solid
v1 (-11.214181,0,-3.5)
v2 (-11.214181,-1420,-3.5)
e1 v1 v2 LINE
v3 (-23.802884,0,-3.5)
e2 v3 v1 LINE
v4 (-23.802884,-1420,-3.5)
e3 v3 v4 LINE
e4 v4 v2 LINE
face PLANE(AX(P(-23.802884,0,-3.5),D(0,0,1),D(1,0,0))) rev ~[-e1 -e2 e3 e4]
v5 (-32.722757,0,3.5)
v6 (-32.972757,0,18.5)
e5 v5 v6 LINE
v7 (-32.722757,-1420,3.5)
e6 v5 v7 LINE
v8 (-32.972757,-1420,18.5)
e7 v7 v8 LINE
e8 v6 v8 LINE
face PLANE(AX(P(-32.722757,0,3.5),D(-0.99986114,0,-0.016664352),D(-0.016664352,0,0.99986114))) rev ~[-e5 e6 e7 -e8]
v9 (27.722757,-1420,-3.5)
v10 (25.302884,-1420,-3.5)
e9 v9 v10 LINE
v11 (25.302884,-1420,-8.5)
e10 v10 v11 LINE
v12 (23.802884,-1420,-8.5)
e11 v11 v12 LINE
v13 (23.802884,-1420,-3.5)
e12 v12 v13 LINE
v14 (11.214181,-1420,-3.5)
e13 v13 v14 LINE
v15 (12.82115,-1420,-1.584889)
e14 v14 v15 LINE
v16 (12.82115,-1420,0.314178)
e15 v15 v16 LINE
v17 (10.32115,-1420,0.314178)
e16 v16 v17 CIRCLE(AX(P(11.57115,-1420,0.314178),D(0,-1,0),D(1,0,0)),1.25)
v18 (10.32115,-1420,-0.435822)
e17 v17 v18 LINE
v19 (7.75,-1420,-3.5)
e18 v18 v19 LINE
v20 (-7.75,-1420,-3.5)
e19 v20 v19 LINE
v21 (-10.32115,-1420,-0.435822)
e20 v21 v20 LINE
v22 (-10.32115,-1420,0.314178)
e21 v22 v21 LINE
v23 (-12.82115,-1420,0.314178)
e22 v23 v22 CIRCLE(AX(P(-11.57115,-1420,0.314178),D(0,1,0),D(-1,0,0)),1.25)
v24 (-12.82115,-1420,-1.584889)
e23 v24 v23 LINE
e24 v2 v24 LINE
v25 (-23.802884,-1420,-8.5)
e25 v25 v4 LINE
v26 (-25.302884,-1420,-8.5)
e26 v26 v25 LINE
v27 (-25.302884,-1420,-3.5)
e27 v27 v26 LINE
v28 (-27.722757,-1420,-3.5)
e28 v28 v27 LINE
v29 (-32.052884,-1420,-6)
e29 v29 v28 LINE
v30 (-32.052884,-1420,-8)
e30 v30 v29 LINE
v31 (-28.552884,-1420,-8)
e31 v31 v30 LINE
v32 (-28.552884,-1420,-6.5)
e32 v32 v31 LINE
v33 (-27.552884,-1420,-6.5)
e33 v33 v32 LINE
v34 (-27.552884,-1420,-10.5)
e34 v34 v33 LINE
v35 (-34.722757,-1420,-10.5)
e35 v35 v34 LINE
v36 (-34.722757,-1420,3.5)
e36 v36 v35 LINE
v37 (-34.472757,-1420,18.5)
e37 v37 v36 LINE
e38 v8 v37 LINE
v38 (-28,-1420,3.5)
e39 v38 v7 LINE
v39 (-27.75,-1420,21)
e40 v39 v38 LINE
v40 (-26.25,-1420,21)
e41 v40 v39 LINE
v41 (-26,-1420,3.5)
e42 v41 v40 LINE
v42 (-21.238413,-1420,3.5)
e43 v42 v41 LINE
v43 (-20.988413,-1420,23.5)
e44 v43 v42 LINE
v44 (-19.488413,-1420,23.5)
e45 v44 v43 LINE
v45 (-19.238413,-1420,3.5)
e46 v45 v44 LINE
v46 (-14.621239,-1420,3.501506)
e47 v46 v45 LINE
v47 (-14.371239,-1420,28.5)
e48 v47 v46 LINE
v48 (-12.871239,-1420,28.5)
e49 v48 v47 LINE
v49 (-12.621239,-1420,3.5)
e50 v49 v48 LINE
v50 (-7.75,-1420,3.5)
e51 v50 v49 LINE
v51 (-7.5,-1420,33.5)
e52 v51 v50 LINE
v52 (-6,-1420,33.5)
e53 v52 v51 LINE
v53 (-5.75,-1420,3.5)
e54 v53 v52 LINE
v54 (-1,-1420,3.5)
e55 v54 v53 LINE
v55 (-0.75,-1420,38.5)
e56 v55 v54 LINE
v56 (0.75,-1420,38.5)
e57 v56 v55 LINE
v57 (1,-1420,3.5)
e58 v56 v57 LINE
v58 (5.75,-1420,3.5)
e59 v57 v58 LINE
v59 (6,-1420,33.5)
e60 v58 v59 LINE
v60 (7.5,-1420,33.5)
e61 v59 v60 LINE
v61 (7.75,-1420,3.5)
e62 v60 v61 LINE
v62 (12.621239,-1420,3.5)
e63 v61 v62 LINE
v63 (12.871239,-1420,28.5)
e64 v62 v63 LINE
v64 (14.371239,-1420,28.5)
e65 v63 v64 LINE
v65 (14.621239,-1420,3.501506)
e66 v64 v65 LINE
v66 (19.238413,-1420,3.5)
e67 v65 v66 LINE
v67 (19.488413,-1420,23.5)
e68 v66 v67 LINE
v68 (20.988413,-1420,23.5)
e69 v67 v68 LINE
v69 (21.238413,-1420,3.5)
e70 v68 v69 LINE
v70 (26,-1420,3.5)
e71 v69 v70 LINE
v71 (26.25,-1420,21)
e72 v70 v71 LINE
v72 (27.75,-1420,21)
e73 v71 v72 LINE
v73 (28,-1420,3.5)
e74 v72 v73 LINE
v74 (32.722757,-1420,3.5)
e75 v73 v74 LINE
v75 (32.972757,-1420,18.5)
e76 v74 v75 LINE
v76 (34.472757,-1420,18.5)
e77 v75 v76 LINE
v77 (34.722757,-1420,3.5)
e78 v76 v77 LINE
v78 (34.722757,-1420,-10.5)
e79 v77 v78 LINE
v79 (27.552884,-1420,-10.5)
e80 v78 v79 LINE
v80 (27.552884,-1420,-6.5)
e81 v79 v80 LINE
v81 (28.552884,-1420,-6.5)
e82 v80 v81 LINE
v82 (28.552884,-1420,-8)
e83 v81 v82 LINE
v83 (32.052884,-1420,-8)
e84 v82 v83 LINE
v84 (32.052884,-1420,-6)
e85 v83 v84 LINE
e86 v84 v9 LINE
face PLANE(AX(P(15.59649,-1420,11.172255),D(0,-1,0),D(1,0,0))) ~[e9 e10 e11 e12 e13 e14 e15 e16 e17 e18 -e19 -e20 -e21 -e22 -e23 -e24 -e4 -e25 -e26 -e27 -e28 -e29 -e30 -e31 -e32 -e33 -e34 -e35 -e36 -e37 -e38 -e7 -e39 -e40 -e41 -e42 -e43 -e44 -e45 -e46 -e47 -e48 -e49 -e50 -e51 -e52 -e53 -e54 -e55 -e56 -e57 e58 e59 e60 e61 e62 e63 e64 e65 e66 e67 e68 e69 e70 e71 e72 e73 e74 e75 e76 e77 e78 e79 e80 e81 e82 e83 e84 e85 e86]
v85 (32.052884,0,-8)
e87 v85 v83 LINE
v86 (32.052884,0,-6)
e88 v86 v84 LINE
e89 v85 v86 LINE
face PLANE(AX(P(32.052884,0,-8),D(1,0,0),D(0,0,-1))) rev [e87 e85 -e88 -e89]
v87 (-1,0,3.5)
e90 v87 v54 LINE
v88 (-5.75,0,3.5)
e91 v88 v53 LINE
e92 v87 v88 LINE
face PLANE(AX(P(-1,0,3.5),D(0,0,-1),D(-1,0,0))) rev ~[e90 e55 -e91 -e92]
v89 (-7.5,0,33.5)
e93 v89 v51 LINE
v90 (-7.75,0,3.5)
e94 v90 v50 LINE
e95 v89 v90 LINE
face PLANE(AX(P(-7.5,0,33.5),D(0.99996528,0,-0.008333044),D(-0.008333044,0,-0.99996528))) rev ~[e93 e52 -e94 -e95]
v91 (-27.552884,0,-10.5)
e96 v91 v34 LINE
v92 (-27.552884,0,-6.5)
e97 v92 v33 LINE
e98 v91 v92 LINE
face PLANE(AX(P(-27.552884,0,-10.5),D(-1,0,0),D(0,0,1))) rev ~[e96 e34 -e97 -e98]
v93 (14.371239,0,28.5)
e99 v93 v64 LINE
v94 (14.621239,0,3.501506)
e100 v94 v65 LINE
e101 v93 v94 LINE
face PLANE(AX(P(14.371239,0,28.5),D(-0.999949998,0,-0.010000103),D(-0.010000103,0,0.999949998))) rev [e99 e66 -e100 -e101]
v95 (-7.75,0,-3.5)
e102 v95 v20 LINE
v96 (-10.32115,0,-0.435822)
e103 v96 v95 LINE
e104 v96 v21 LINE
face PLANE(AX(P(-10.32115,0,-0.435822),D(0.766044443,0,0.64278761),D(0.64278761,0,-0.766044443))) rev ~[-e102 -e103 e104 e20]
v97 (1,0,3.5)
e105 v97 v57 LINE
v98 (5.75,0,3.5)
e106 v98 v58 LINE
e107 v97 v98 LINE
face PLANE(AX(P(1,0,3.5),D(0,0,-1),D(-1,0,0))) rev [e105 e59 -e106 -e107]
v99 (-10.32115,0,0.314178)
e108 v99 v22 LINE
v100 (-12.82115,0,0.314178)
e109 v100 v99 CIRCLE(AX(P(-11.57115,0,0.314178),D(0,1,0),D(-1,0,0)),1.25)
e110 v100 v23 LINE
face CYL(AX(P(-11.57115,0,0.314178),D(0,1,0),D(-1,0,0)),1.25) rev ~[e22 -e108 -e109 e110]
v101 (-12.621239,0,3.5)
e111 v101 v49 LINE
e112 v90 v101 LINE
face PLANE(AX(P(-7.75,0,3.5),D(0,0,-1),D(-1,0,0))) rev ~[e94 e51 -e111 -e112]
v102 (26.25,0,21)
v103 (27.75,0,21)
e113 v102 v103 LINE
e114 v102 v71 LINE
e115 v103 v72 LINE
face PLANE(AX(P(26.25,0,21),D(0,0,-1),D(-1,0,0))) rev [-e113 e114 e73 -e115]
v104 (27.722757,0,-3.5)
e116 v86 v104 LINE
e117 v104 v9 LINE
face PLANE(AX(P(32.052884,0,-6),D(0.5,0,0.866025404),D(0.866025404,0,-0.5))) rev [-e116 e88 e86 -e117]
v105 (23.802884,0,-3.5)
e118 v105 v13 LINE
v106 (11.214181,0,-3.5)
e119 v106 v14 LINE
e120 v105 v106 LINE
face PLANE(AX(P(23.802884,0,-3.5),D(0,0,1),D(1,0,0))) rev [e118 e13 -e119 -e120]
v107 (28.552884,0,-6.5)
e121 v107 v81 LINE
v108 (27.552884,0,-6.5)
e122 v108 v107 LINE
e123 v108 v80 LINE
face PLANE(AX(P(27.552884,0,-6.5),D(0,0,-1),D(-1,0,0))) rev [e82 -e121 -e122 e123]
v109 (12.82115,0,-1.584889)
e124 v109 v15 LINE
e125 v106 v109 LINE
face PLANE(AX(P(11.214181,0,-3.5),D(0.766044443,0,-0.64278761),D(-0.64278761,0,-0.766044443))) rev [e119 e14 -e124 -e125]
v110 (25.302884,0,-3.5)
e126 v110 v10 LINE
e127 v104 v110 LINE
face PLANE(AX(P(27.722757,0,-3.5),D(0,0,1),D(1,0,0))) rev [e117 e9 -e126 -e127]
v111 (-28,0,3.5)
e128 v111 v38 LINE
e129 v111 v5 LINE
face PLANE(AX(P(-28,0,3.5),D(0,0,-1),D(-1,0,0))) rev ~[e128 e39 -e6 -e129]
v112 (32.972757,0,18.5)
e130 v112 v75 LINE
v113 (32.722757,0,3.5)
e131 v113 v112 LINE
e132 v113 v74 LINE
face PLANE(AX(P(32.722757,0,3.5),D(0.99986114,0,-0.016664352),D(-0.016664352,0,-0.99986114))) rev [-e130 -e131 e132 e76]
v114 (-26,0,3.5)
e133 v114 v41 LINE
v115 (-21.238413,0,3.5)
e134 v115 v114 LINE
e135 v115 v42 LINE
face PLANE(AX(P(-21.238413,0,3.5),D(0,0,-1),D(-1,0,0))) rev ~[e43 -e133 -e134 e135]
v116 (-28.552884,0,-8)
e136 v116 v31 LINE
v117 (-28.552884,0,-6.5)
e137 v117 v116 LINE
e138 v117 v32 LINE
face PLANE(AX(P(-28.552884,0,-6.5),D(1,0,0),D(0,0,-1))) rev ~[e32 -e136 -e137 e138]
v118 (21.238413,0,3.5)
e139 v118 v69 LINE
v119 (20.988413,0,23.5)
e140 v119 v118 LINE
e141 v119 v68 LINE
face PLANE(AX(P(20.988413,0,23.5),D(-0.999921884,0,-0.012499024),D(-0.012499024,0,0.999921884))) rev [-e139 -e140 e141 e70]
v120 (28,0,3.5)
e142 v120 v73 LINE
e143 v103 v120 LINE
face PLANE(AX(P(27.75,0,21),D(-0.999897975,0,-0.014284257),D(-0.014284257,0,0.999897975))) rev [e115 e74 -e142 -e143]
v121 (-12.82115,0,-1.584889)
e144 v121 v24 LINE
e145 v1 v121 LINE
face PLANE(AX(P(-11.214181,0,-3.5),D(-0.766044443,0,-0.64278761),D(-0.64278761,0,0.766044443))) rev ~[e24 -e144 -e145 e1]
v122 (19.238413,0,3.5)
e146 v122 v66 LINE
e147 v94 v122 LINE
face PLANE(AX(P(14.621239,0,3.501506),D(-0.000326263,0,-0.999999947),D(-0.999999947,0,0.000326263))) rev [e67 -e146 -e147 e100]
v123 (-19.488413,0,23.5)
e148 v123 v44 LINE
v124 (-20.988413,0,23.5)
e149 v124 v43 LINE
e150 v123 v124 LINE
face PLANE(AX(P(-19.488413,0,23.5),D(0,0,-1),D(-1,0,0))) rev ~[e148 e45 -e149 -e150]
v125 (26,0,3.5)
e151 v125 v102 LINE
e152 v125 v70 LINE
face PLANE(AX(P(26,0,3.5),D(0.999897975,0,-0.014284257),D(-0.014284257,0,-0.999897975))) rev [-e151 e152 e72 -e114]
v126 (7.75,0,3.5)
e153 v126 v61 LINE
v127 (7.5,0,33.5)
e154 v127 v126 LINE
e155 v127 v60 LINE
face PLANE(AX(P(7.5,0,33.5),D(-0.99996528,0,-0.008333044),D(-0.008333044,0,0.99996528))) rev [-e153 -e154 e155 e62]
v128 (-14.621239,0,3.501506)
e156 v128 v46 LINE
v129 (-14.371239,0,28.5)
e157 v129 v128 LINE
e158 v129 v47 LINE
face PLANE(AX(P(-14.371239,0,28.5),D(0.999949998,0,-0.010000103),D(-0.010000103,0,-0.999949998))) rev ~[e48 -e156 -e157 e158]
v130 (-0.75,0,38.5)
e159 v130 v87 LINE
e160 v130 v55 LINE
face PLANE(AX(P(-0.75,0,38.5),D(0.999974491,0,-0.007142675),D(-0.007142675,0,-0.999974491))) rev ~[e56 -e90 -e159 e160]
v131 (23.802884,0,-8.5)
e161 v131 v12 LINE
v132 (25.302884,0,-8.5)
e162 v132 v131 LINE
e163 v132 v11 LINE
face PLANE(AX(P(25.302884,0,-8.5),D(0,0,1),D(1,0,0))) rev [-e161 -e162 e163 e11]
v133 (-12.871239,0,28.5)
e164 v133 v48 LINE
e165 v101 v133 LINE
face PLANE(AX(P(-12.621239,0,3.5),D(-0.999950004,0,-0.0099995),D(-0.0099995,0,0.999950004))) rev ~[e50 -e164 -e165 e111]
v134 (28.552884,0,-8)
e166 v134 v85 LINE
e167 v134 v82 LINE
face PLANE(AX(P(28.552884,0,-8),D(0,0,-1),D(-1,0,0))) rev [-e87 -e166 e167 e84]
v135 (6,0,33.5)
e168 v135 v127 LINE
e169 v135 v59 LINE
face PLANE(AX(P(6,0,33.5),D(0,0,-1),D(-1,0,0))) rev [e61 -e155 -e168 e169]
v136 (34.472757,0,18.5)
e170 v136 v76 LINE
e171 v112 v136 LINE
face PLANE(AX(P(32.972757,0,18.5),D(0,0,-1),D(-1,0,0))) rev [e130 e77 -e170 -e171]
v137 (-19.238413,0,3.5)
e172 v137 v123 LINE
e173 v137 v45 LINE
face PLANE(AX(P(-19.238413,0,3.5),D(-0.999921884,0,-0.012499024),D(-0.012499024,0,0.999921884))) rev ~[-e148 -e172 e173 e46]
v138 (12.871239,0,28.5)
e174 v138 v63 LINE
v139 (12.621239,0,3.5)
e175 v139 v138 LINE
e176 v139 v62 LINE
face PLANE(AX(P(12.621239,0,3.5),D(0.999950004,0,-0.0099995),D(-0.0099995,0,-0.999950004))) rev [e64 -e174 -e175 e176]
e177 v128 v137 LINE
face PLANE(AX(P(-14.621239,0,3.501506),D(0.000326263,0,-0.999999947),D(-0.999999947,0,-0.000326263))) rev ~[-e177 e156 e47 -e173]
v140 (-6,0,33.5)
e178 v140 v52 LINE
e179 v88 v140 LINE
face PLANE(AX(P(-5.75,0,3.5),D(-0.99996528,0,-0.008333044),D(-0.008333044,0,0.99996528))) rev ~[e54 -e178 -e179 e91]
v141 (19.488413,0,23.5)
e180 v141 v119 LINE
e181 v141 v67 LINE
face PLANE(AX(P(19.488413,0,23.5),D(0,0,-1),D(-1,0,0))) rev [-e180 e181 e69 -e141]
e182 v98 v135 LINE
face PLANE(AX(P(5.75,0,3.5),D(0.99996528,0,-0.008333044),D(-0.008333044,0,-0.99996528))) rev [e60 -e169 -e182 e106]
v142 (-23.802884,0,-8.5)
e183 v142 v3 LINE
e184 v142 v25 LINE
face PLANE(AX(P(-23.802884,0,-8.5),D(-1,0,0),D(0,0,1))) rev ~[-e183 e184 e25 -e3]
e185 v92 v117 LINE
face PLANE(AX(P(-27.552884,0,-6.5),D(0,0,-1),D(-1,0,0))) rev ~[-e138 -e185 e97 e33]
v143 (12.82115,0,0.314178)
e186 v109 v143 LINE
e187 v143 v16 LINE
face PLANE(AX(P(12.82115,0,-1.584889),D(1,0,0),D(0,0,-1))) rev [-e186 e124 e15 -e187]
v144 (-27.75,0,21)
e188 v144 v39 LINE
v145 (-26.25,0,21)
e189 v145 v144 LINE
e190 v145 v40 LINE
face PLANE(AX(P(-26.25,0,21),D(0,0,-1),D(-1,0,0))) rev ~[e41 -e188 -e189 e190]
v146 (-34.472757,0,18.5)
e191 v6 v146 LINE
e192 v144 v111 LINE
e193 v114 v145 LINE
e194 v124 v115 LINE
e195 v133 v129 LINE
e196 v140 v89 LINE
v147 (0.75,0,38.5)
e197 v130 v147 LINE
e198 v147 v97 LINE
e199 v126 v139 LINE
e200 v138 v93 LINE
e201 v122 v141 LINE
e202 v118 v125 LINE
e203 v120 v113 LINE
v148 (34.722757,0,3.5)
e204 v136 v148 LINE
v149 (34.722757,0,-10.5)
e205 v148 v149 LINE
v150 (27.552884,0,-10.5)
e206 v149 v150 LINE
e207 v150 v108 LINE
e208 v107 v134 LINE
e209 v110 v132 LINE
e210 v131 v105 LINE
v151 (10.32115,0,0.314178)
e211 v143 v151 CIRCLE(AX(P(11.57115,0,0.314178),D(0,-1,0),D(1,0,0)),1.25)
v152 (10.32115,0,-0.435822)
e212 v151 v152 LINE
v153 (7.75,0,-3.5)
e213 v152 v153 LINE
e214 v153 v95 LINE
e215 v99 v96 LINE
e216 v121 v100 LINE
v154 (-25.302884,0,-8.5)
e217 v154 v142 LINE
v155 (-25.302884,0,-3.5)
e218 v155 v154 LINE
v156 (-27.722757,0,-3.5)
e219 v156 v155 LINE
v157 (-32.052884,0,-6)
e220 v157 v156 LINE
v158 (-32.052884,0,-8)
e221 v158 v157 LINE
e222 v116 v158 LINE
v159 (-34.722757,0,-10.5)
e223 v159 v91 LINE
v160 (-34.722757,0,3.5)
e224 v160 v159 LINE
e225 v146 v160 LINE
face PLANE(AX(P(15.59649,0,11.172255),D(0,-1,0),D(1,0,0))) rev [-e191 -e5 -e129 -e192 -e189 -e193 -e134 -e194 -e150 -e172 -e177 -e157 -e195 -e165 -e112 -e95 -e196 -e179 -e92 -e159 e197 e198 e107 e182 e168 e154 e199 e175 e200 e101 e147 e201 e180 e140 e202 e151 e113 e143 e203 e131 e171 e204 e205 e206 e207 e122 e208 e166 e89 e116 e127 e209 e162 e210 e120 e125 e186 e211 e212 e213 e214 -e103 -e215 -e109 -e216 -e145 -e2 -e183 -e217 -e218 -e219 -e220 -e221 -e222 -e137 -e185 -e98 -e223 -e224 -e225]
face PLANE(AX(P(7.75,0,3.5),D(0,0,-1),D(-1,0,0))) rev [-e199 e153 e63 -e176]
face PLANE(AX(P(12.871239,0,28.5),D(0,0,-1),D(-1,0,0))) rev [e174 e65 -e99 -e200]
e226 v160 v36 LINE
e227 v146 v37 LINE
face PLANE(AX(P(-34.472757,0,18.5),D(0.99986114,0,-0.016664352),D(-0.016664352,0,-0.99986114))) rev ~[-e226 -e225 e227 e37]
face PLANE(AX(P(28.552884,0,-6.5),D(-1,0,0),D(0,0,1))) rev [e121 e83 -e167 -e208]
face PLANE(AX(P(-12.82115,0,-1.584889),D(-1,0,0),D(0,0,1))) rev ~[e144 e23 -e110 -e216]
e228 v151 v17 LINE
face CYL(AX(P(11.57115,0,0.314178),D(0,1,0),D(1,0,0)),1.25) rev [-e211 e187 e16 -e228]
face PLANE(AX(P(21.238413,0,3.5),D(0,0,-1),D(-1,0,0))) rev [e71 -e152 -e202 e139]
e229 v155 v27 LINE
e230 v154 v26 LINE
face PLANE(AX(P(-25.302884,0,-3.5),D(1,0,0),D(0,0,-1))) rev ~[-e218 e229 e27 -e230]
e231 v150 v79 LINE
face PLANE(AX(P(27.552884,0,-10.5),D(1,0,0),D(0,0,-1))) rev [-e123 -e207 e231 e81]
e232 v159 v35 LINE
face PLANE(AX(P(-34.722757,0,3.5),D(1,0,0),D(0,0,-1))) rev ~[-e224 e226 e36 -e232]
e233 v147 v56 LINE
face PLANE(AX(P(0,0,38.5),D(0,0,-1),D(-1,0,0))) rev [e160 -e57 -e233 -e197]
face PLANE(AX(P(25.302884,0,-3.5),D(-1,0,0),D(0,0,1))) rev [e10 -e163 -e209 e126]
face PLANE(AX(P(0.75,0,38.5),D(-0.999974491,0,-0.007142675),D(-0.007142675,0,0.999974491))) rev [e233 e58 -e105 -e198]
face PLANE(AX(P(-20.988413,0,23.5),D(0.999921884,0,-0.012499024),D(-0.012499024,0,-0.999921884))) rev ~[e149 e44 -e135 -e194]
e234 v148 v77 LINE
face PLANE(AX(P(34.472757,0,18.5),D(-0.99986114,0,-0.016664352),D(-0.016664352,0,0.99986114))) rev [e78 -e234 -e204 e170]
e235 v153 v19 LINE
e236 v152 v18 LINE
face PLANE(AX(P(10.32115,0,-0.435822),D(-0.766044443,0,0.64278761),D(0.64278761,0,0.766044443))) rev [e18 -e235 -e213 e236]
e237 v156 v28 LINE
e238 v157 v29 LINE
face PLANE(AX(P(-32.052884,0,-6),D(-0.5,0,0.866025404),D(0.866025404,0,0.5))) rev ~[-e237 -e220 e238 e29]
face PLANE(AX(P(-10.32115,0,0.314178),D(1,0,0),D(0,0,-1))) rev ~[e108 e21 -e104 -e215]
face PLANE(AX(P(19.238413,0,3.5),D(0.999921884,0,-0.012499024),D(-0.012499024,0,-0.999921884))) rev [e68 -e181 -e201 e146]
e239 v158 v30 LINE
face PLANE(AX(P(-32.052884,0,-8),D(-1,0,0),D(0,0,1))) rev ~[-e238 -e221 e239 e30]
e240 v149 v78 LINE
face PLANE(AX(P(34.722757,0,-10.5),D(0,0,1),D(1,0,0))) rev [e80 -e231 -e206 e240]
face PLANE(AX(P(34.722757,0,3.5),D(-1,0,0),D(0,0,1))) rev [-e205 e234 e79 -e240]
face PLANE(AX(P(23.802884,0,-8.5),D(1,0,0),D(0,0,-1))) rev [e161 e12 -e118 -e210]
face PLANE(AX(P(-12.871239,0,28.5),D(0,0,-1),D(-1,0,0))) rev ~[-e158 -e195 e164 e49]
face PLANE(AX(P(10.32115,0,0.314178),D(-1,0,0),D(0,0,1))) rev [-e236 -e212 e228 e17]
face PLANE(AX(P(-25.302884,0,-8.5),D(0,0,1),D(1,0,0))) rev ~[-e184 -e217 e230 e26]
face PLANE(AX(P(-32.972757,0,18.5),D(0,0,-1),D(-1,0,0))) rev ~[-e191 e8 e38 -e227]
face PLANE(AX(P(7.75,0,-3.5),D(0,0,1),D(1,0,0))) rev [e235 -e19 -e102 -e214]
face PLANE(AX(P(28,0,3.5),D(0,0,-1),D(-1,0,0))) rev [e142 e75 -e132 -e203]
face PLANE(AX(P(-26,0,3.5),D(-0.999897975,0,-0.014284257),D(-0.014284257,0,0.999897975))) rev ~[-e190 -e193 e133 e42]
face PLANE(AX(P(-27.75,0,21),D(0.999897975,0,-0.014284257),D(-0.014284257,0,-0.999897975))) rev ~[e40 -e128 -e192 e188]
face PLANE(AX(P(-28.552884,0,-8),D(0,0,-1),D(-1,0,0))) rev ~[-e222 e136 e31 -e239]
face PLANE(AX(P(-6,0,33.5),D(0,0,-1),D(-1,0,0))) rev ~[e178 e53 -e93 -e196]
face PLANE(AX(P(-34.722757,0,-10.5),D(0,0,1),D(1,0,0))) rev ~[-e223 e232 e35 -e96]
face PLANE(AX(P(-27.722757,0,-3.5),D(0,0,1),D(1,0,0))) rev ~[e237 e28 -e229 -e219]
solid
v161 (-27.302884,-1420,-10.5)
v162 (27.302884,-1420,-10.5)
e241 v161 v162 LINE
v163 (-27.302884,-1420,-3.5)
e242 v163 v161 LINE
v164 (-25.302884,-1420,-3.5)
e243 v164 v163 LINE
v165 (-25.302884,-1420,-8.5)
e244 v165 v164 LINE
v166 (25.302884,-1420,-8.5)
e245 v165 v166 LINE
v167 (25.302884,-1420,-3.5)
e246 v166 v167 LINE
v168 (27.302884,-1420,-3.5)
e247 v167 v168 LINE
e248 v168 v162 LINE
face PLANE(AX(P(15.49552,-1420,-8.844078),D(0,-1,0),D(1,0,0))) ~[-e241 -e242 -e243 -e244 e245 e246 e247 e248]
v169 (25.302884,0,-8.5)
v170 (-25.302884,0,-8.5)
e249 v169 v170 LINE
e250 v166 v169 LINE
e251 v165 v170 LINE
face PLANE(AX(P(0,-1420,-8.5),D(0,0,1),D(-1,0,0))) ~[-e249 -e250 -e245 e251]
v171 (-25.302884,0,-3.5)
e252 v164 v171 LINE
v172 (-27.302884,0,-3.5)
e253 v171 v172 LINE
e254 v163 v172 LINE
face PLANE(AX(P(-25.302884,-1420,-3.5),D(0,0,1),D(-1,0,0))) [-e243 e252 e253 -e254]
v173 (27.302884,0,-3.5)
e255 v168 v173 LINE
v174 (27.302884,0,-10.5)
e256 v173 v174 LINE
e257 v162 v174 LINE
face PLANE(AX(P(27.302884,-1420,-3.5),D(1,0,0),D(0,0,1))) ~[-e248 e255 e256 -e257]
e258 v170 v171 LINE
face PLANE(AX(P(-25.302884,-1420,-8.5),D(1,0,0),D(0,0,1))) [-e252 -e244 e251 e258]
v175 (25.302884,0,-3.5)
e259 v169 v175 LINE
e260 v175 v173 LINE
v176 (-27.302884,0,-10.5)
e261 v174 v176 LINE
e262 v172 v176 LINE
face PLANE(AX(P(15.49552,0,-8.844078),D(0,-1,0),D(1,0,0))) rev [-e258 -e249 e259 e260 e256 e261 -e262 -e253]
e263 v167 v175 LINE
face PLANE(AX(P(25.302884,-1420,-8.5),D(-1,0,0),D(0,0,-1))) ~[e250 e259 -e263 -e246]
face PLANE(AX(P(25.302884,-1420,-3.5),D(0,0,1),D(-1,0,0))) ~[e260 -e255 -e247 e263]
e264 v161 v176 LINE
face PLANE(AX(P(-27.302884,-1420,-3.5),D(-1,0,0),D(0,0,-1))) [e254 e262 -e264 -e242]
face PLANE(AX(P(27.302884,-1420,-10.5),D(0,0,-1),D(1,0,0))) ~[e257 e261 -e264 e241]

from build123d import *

# Parameters (mm, degrees)
F1_DEPTH = 1420
F3_DEPTH = 1420


with BuildPart() as f1:
    # F0 (on Front) → F1 (new body)
    with BuildSketch(Plane.XZ):
        with BuildLine():
            Line((-32.7227568555, 3.4999999998), (-32.9727568555, 18.4999999998))
            Line((-32.9727568555, 18.4999999998), (-34.4727568555, 18.4999999998))
            Line((-34.4727568555, 18.4999999998), (-34.7227568555, 3.4999999998))
            Line((-34.7227568555, 3.4999999998), (-34.7227568555, -10.5000000002))
            Line((-34.7227568555, -10.5000000002), (-27.5528838745, -10.5000000002))
            Line((-27.5528838745, -10.5000000002), (-27.5528838745, -6.5000000002))
            Line((-27.5528838745, -6.5000000002), (-28.5528838745, -6.5000000002))
            Line((-28.5528838745, -6.5000000002), (-28.5528838745, -8.0000000002))
            Line((-28.5528838745, -8.0000000002), (-32.0528838745, -8.0000000002))
            Line((-32.0528838745, -8.0000000002), (-32.0528838745, -6.0000000002))
            Line((-32.0528838745, -6.0000000002), (-27.7227568555, -3.5000000002))
            Line((-27.7227568555, -3.5000000002), (-27.1091535687, -3.5000000002))
            Line((-27.1091535687, -3.5000000002), (-25.3028838745, -3.5000000002))
            Line((-25.3028838745, -3.5000000002), (-25.3028838745, -8.5000000002))
            Line((-25.3028838745, -8.5000000002), (-23.8028838745, -8.5000000002))
            Line((-23.8028838745, -8.5000000002), (-23.8028838745, -3.5000000002))
            Line((-23.8028838745, -3.5000000002), (-11.2141814145, -3.5000000002))
            Line((-11.2141814145, -3.5000000002), (-12.8211504387, -1.5848888924))
            Line((-12.8211504387, -1.5848888924), (-12.8211504387, 0.3141777723))
            ThreePointArc((-12.8211504387, 0.3141777723), (-11.5711504387, 1.5641777723), (-10.3211504387, 0.3141777723))
            Line((-10.3211504387, 0.3141777723), (-10.3211504387, -0.4358222277))
            Line((-10.3211504387, -0.4358222277), (-7.75, -3.5000000002))
            Line((-7.75, -3.5000000002), (0, -3.5000000002))
            Line((0, -3.5000000002), (0, 38.4999999998))
            Line((0, 38.4999999998), (-0.75, 38.4999999998))
            Line((-0.75, 38.4999999998), (-1, 3.4999999998))
            Line((-1, 3.4999999998), (-5.75, 3.4999999998))
            Line((-5.75, 3.4999999998), (-6, 33.4999999998))
            Line((-6, 33.4999999998), (-7.5, 33.4999999998))
            Line((-7.5, 33.4999999998), (-7.75, 3.4999999998))
            Line((-7.75, 3.4999999998), (-12.6212390675, 3.4999999998))
            Line((-12.6212390675, 3.4999999998), (-12.8712390675, 28.4999999998))
            Line((-12.8712390675, 28.4999999998), (-14.3712390675, 28.4999999998))
            Line((-14.3712390675, 28.4999999998), (-14.6212390675, 3.5015064141))
            Line((-14.6212390675, 3.5015064141), (-19.2384126596, 3.4999999998))
            Line((-19.2384126596, 3.4999999998), (-19.4884126596, 23.4999999998))
            Line((-19.4884126596, 23.4999999998), (-20.9884126596, 23.4999999998))
            Line((-20.9884126596, 23.4999999998), (-21.2384126596, 3.4999999998))
            Line((-21.2384126596, 3.4999999998), (-26, 3.4999999998))
            Line((-26, 3.4999999998), (-26.25, 20.9999999998))
            Line((-26.25, 20.9999999998), (-27.75, 20.9999999998))
            Line((-27.75, 20.9999999998), (-28, 3.4999999998))
            Line((-28, 3.4999999998), (-32.7227568555, 3.4999999998))
        make_face()
    extrude(amount=F1_DEPTH)

    # F4: F1 across face


with BuildPart() as f3:
    # F2 (on face) → F3 (new body)
    with BuildSketch(Plane.XZ.offset(1420)):
        Polygon((-25.3028838745, -8.5000000002), (-25.3028838745, -3.5000000002), (-27.3028838745, -3.5000000002), (-27.3028838745, -10.5000000002), (0, -10.5000000002), (0, -8.5000000002), align=None)
    extrude(amount=-F3_DEPTH)

    # F5: F3 across face


with BuildPart() as f1_1:
    add(f1.part)
    add(f1.part.mirror(Plane(origin=(0, -710, 17.4999999998), x_dir=(0, 1, 0), z_dir=(1, 0, 0))))


with BuildPart() as f3_1:
    add(f3.part)
    add(f3.part.mirror(Plane(origin=(0, -710, -9.5000000002), x_dir=(0, 1, 0), z_dir=(1, 0, 0))))


solid = Compound([f1_1.part, f3_1.part])
